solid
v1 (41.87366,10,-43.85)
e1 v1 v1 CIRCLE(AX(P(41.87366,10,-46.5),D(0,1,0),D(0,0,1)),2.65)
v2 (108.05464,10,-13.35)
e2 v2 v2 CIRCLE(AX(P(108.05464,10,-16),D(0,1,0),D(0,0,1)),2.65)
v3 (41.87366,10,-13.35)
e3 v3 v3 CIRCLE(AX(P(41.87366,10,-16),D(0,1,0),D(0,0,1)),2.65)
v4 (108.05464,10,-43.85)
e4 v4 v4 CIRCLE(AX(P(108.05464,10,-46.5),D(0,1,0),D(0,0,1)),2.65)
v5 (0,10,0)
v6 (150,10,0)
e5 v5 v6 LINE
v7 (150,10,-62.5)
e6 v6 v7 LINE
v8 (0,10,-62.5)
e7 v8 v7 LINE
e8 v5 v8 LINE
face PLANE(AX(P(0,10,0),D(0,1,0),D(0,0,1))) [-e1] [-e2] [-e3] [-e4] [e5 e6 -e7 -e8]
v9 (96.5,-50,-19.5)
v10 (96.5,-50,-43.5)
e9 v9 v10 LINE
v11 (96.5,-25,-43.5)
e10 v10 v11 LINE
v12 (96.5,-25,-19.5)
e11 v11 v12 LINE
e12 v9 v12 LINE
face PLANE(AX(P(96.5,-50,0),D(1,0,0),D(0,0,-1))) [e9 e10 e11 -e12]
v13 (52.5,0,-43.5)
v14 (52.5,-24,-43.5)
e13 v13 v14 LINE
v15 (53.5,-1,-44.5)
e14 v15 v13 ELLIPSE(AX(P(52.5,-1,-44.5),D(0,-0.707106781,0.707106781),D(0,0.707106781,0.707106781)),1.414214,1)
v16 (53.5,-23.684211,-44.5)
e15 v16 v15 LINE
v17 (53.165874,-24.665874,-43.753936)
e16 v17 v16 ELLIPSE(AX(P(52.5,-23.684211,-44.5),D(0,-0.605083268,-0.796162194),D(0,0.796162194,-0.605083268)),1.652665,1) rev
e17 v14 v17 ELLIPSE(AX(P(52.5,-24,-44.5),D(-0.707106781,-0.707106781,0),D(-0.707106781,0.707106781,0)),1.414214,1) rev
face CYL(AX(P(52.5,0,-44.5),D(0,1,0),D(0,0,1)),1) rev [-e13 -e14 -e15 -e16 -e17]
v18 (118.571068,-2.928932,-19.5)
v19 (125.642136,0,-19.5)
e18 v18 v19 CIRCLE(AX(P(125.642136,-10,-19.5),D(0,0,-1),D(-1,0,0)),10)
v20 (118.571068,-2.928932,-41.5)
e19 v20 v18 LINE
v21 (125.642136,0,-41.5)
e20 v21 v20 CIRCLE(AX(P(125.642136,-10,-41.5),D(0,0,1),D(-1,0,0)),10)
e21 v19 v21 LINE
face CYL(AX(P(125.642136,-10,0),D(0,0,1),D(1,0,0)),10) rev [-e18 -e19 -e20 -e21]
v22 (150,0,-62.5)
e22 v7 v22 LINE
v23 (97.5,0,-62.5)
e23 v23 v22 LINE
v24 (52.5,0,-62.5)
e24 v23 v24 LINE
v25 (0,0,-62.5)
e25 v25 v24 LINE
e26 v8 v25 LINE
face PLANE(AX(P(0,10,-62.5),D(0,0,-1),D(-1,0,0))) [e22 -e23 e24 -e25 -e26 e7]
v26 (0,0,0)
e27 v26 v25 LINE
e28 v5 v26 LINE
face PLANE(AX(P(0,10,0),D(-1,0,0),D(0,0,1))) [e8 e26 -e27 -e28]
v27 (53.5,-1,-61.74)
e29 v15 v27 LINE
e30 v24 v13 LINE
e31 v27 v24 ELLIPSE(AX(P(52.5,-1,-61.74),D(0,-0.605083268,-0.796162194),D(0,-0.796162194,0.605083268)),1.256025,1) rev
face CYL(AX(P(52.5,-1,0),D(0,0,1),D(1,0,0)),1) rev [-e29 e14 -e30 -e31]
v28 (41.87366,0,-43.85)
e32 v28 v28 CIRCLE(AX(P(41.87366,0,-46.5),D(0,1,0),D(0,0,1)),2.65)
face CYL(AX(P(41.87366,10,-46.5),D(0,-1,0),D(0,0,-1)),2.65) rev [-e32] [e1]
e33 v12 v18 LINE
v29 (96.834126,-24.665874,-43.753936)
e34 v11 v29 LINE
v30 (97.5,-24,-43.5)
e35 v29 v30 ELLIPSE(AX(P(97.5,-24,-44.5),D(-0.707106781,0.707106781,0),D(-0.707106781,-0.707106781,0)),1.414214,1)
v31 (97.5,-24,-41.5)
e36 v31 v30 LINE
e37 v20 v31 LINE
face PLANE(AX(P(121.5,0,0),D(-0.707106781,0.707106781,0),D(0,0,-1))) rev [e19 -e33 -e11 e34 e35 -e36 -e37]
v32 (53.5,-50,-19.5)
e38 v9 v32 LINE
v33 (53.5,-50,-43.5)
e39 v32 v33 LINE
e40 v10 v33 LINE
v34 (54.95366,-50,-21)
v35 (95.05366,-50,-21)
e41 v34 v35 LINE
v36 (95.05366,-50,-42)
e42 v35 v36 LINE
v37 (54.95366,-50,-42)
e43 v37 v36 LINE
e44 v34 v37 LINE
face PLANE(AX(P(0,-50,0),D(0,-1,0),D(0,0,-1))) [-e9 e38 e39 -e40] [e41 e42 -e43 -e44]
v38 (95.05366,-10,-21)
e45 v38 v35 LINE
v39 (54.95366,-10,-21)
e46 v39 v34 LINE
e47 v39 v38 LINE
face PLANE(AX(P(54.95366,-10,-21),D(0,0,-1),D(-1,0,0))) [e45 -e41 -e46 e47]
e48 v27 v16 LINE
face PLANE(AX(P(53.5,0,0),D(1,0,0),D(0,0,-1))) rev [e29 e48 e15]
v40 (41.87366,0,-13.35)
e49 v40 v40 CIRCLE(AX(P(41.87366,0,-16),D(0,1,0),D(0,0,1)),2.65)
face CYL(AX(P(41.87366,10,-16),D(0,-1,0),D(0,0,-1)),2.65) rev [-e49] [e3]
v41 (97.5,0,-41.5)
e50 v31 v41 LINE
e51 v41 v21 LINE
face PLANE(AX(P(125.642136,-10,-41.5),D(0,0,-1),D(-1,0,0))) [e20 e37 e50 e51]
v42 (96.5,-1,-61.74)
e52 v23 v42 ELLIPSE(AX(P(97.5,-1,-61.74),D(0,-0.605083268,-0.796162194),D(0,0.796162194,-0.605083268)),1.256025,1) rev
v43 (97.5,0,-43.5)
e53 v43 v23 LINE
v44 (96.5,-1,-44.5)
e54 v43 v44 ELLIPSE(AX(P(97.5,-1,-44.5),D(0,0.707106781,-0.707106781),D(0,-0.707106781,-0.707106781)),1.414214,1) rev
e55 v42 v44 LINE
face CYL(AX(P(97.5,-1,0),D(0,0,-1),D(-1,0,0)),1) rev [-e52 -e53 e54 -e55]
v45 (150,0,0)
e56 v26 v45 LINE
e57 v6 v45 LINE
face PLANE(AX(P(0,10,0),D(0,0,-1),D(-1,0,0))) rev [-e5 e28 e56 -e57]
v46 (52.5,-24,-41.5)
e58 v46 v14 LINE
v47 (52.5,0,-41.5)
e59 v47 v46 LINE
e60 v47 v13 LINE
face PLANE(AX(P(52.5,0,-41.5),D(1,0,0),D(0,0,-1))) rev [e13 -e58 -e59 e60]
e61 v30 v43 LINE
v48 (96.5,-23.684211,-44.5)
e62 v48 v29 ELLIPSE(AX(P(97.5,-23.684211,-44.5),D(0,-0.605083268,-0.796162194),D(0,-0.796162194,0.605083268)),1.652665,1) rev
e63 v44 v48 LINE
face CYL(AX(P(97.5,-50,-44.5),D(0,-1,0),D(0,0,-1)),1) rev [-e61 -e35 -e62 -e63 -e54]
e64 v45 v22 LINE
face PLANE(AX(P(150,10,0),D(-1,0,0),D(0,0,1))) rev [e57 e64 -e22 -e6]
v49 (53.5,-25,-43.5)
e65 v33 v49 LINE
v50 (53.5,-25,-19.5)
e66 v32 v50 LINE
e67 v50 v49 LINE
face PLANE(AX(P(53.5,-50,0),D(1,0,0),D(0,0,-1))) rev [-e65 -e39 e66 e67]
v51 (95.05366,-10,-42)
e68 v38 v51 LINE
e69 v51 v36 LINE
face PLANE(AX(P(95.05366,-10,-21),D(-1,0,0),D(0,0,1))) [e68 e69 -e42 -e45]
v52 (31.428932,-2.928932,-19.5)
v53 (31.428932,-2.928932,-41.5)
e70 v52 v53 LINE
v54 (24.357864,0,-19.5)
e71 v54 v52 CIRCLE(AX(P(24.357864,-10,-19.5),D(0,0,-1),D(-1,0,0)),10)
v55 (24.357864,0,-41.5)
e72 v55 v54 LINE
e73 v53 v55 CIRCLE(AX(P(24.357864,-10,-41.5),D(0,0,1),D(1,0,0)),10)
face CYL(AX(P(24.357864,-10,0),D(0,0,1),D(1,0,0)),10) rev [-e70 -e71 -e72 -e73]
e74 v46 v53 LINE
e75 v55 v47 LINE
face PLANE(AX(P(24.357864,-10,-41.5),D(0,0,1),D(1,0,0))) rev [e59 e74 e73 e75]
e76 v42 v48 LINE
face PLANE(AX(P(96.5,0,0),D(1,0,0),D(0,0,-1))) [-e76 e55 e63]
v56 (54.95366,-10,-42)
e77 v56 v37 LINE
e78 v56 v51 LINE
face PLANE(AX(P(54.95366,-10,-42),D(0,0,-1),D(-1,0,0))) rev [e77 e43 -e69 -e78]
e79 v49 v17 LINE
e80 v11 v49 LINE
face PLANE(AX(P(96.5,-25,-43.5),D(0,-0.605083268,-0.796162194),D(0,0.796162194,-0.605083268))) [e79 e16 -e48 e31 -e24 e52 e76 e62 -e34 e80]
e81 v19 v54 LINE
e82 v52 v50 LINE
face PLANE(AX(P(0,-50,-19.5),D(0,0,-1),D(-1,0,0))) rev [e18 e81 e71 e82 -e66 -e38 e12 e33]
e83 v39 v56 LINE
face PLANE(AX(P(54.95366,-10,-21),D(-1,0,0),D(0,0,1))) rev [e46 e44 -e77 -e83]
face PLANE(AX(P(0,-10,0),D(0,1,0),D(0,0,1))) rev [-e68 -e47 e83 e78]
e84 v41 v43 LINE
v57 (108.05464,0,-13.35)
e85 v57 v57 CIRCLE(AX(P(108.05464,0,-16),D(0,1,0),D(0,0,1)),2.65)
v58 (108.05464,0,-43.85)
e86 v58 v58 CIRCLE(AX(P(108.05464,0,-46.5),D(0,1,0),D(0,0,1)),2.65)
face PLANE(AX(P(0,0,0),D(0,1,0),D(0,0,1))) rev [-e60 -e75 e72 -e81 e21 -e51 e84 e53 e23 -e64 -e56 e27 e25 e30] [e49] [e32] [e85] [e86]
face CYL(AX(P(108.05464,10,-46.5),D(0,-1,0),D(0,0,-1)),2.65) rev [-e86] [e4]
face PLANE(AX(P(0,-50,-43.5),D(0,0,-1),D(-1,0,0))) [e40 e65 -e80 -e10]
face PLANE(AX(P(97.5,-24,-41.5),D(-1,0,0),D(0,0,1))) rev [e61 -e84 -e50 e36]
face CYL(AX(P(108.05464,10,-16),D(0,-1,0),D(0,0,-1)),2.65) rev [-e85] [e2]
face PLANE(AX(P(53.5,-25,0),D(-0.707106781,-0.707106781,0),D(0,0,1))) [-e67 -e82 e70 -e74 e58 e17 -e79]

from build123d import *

# Parameters (mm, degrees)
SKETCH1_R           = 2.65
BOSS_EXTRUDE1_DEPTH = 10
SKETCH2_W           = 43
SKETCH2_H           = 24
BOSS_EXTRUDE2_DEPTH = 50
CHAMFER12_SIZE      = 25
SKETCH11_W          = 40.1
SKETCH11_H          = 21
CUT_EXTRUDE3_DEPTH  = 40
BOSS_EXTRUDE3_DEPTH = 43
FILLET1_R           = 10
FILLET5_R           = 1
CUT_EXTRUDE4_DEPTH  = 2


with BuildPart() as part:
    # Sketch1 → Boss-Extrude1 (new body)
    with BuildSketch(Plane(origin=(0, 0, 0), x_dir=(1, 0, 0), z_dir=(0, 1, 0))):
        Polygon((0, 0), (150, 0), (150, 62.5), (99, 62.5), (51, 62.5), (0, 62.5), align=None)
        with Locations(Location((108.05464, 46.5, 0), (0, 0, 270))):
            Circle(SKETCH1_R, mode=Mode.SUBTRACT)
        with Locations(Location((41.87366, 46.5, 0), (0, 0, 270))):
            Circle(SKETCH1_R, mode=Mode.SUBTRACT)
        with Locations(Location((41.87366, 16, 0), (0, 0, 270))):
            Circle(SKETCH1_R, mode=Mode.SUBTRACT)
        with Locations(Location((108.05464, 16, 0), (0, 0, 270))):
            Circle(SKETCH1_R, mode=Mode.SUBTRACT)
    extrude(amount=BOSS_EXTRUDE1_DEPTH)

    # Sketch2 → Boss-Extrude2 (add)
    with BuildSketch(Plane.XZ):
        with Locations((75, -31.5)):
            Rectangle(SKETCH2_W, SKETCH2_H)
    extrude(amount=BOSS_EXTRUDE2_DEPTH)

    # Chamfer12
    chamfer12_edges = [part.edges().sort_by_distance(p)[0] for p in [
        (53.5, 0, -31.5),
        (96.5, 0, -31.5),
    ]]
    chamfer(chamfer12_edges, length=CHAMFER12_SIZE)

    # Sketch11 → Cut-Extrude3 (cut)
    with BuildSketch(Plane.XZ.offset(50)):
        with Locations((75.00366, -31.5)):
            Rectangle(SKETCH11_W, SKETCH11_H)
    extrude(amount=-CUT_EXTRUDE3_DEPTH, mode=Mode.SUBTRACT)

    # Sketch12 → Boss-Extrude3 (add)
    with BuildSketch(Plane.ZY.offset(-53.5)):
        Polygon((-43.5, -25), (-43.5, 0), (-62.5, 0), align=None)
    extrude(amount=-BOSS_EXTRUDE3_DEPTH)

    # Fillet1
    fillet1_edges = [part.edges().sort_by_distance(p)[0] for p in [
        (28.5, 0, -31.5),
        (121.5, 0, -31.5),
    ]]
    fillet(fillet1_edges, radius=FILLET1_R)

    # Fillet5
    # the kernel refuses this fillet: 1 mm, written as the material it adds along each edge
    with BuildSketch(Plane(origin=(96.5, 0, -41), x_dir=(1, 0, 0), z_dir=(0, 0, -1))) as fillet5_piece_1_section:
        with BuildLine():
            CenterArc((FILLET5_R, FILLET5_R), FILLET5_R, 180, 90)
            Line((0, FILLET5_R), (0, 0))
            Line((0, 0), (FILLET5_R, 0))
        make_face()
    fillet5_piece_1 = extrude(amount=21.5, mode=Mode.PRIVATE)
    fillet5_piece_1 = split(fillet5_piece_1, bisect_by=Plane(origin=(96.726395114, -9.898830574, -54.976888763), z_dir=(0, 0.6050832675335575, 0.7961621941231029)), keep=Keep.TOP, mode=Mode.PRIVATE)
    add(fillet5_piece_1)
    with BuildSketch(Plane(origin=(96.5, -27.5, -43.5), x_dir=(1, 0, 0), z_dir=(0, 1, 0))) as fillet5_piece_2_section:
        with BuildLine():
            CenterArc((FILLET5_R, FILLET5_R), FILLET5_R, 180, 90)
            Line((0, FILLET5_R), (0, 0))
            Line((0, 0), (FILLET5_R, 0))
        make_face()
    fillet5_piece_2 = extrude(amount=30, mode=Mode.PRIVATE)
    fillet5_piece_2 = split(fillet5_piece_2, bisect_by=Plane(origin=(102.972342409, -18.527657591, -43.72500317), z_dir=(-0.7071067811865476, 0.7071067811865476, 0)), keep=Keep.TOP, mode=Mode.PRIVATE)
    fillet5_piece_2 = split(fillet5_piece_2, bisect_by=Plane(origin=(96.726036712, -16.829582585, -49.709517236), z_dir=(0, 0.6050832675335575, 0.7961621941231029)), keep=Keep.TOP, mode=Mode.PRIVATE)
    add(fillet5_piece_2)
    with BuildSketch(Plane(origin=(53.5, 0, -41), x_dir=(-1, 0, 0), z_dir=(0, 0, -1))) as fillet5_piece_3_section:
        with BuildLine():
            CenterArc((FILLET5_R, -FILLET5_R), FILLET5_R, 90, 90)
            Line((0, -FILLET5_R), (0, 0))
            Line((0, 0), (FILLET5_R, 0))
        make_face()
    fillet5_piece_3 = extrude(amount=21.5, mode=Mode.PRIVATE)
    fillet5_piece_3 = split(fillet5_piece_3, bisect_by=Plane(origin=(53.273604886, -9.898830574, -54.976888763), z_dir=(0, 0.6050832675335575, 0.7961621941231029)), keep=Keep.TOP, mode=Mode.PRIVATE)
    add(fillet5_piece_3)
    with BuildSketch(Plane(origin=(53.5, -27.5, -43.5), x_dir=(0, 0, -1), z_dir=(0, 1, 0))) as fillet5_piece_4_section:
        with BuildLine():
            CenterArc((FILLET5_R, FILLET5_R), FILLET5_R, 180, 90)
            Line((0, FILLET5_R), (0, 0))
            Line((0, 0), (FILLET5_R, 0))
        make_face()
    fillet5_piece_4 = extrude(amount=30, mode=Mode.PRIVATE)
    fillet5_piece_4 = split(fillet5_piece_4, bisect_by=Plane(origin=(47.02765759, -18.52765759, -43.72500317), z_dir=(0.7071067811865476, 0.7071067811865476, 0)), keep=Keep.TOP, mode=Mode.PRIVATE)
    fillet5_piece_4 = split(fillet5_piece_4, bisect_by=Plane(origin=(53.273963288, -16.829582583, -49.709517237), z_dir=(0, 0.6050832675335575, 0.7961621941231029)), keep=Keep.TOP, mode=Mode.PRIVATE)
    add(fillet5_piece_4)

    # Sketch14 → Cut-Extrude4 (cut)
    with BuildSketch(Plane(origin=(0, 0, -43.5), x_dir=(-1, 0, 0), z_dir=(0, 0, -1))):
        with BuildLine():
            Line((-24.357864376, 0), (-52.5, 0))
            Line((-52.5, 0), (-52.5, -24))
            Line((-52.5, -24), (-31.428932188, -2.928932188))
            ThreePointArc((-31.428932188, -2.928932188), (-28.1846987, -0.761204675), (-24.357864376, 0))
        make_face()
        with BuildLine():
            Line((-97.5, -24), (-97.5, 0))
            Line((-97.5, 0), (-125.642135624, 0))
            ThreePointArc((-125.642135624, 0), (-121.8153013, -0.761204675), (-118.571067812, -2.928932188))
            Line((-118.571067812, -2.928932188), (-97.5, -24))
        make_face()
    extrude(amount=-CUT_EXTRUDE4_DEPTH, mode=Mode.SUBTRACT)


solid = part.part
